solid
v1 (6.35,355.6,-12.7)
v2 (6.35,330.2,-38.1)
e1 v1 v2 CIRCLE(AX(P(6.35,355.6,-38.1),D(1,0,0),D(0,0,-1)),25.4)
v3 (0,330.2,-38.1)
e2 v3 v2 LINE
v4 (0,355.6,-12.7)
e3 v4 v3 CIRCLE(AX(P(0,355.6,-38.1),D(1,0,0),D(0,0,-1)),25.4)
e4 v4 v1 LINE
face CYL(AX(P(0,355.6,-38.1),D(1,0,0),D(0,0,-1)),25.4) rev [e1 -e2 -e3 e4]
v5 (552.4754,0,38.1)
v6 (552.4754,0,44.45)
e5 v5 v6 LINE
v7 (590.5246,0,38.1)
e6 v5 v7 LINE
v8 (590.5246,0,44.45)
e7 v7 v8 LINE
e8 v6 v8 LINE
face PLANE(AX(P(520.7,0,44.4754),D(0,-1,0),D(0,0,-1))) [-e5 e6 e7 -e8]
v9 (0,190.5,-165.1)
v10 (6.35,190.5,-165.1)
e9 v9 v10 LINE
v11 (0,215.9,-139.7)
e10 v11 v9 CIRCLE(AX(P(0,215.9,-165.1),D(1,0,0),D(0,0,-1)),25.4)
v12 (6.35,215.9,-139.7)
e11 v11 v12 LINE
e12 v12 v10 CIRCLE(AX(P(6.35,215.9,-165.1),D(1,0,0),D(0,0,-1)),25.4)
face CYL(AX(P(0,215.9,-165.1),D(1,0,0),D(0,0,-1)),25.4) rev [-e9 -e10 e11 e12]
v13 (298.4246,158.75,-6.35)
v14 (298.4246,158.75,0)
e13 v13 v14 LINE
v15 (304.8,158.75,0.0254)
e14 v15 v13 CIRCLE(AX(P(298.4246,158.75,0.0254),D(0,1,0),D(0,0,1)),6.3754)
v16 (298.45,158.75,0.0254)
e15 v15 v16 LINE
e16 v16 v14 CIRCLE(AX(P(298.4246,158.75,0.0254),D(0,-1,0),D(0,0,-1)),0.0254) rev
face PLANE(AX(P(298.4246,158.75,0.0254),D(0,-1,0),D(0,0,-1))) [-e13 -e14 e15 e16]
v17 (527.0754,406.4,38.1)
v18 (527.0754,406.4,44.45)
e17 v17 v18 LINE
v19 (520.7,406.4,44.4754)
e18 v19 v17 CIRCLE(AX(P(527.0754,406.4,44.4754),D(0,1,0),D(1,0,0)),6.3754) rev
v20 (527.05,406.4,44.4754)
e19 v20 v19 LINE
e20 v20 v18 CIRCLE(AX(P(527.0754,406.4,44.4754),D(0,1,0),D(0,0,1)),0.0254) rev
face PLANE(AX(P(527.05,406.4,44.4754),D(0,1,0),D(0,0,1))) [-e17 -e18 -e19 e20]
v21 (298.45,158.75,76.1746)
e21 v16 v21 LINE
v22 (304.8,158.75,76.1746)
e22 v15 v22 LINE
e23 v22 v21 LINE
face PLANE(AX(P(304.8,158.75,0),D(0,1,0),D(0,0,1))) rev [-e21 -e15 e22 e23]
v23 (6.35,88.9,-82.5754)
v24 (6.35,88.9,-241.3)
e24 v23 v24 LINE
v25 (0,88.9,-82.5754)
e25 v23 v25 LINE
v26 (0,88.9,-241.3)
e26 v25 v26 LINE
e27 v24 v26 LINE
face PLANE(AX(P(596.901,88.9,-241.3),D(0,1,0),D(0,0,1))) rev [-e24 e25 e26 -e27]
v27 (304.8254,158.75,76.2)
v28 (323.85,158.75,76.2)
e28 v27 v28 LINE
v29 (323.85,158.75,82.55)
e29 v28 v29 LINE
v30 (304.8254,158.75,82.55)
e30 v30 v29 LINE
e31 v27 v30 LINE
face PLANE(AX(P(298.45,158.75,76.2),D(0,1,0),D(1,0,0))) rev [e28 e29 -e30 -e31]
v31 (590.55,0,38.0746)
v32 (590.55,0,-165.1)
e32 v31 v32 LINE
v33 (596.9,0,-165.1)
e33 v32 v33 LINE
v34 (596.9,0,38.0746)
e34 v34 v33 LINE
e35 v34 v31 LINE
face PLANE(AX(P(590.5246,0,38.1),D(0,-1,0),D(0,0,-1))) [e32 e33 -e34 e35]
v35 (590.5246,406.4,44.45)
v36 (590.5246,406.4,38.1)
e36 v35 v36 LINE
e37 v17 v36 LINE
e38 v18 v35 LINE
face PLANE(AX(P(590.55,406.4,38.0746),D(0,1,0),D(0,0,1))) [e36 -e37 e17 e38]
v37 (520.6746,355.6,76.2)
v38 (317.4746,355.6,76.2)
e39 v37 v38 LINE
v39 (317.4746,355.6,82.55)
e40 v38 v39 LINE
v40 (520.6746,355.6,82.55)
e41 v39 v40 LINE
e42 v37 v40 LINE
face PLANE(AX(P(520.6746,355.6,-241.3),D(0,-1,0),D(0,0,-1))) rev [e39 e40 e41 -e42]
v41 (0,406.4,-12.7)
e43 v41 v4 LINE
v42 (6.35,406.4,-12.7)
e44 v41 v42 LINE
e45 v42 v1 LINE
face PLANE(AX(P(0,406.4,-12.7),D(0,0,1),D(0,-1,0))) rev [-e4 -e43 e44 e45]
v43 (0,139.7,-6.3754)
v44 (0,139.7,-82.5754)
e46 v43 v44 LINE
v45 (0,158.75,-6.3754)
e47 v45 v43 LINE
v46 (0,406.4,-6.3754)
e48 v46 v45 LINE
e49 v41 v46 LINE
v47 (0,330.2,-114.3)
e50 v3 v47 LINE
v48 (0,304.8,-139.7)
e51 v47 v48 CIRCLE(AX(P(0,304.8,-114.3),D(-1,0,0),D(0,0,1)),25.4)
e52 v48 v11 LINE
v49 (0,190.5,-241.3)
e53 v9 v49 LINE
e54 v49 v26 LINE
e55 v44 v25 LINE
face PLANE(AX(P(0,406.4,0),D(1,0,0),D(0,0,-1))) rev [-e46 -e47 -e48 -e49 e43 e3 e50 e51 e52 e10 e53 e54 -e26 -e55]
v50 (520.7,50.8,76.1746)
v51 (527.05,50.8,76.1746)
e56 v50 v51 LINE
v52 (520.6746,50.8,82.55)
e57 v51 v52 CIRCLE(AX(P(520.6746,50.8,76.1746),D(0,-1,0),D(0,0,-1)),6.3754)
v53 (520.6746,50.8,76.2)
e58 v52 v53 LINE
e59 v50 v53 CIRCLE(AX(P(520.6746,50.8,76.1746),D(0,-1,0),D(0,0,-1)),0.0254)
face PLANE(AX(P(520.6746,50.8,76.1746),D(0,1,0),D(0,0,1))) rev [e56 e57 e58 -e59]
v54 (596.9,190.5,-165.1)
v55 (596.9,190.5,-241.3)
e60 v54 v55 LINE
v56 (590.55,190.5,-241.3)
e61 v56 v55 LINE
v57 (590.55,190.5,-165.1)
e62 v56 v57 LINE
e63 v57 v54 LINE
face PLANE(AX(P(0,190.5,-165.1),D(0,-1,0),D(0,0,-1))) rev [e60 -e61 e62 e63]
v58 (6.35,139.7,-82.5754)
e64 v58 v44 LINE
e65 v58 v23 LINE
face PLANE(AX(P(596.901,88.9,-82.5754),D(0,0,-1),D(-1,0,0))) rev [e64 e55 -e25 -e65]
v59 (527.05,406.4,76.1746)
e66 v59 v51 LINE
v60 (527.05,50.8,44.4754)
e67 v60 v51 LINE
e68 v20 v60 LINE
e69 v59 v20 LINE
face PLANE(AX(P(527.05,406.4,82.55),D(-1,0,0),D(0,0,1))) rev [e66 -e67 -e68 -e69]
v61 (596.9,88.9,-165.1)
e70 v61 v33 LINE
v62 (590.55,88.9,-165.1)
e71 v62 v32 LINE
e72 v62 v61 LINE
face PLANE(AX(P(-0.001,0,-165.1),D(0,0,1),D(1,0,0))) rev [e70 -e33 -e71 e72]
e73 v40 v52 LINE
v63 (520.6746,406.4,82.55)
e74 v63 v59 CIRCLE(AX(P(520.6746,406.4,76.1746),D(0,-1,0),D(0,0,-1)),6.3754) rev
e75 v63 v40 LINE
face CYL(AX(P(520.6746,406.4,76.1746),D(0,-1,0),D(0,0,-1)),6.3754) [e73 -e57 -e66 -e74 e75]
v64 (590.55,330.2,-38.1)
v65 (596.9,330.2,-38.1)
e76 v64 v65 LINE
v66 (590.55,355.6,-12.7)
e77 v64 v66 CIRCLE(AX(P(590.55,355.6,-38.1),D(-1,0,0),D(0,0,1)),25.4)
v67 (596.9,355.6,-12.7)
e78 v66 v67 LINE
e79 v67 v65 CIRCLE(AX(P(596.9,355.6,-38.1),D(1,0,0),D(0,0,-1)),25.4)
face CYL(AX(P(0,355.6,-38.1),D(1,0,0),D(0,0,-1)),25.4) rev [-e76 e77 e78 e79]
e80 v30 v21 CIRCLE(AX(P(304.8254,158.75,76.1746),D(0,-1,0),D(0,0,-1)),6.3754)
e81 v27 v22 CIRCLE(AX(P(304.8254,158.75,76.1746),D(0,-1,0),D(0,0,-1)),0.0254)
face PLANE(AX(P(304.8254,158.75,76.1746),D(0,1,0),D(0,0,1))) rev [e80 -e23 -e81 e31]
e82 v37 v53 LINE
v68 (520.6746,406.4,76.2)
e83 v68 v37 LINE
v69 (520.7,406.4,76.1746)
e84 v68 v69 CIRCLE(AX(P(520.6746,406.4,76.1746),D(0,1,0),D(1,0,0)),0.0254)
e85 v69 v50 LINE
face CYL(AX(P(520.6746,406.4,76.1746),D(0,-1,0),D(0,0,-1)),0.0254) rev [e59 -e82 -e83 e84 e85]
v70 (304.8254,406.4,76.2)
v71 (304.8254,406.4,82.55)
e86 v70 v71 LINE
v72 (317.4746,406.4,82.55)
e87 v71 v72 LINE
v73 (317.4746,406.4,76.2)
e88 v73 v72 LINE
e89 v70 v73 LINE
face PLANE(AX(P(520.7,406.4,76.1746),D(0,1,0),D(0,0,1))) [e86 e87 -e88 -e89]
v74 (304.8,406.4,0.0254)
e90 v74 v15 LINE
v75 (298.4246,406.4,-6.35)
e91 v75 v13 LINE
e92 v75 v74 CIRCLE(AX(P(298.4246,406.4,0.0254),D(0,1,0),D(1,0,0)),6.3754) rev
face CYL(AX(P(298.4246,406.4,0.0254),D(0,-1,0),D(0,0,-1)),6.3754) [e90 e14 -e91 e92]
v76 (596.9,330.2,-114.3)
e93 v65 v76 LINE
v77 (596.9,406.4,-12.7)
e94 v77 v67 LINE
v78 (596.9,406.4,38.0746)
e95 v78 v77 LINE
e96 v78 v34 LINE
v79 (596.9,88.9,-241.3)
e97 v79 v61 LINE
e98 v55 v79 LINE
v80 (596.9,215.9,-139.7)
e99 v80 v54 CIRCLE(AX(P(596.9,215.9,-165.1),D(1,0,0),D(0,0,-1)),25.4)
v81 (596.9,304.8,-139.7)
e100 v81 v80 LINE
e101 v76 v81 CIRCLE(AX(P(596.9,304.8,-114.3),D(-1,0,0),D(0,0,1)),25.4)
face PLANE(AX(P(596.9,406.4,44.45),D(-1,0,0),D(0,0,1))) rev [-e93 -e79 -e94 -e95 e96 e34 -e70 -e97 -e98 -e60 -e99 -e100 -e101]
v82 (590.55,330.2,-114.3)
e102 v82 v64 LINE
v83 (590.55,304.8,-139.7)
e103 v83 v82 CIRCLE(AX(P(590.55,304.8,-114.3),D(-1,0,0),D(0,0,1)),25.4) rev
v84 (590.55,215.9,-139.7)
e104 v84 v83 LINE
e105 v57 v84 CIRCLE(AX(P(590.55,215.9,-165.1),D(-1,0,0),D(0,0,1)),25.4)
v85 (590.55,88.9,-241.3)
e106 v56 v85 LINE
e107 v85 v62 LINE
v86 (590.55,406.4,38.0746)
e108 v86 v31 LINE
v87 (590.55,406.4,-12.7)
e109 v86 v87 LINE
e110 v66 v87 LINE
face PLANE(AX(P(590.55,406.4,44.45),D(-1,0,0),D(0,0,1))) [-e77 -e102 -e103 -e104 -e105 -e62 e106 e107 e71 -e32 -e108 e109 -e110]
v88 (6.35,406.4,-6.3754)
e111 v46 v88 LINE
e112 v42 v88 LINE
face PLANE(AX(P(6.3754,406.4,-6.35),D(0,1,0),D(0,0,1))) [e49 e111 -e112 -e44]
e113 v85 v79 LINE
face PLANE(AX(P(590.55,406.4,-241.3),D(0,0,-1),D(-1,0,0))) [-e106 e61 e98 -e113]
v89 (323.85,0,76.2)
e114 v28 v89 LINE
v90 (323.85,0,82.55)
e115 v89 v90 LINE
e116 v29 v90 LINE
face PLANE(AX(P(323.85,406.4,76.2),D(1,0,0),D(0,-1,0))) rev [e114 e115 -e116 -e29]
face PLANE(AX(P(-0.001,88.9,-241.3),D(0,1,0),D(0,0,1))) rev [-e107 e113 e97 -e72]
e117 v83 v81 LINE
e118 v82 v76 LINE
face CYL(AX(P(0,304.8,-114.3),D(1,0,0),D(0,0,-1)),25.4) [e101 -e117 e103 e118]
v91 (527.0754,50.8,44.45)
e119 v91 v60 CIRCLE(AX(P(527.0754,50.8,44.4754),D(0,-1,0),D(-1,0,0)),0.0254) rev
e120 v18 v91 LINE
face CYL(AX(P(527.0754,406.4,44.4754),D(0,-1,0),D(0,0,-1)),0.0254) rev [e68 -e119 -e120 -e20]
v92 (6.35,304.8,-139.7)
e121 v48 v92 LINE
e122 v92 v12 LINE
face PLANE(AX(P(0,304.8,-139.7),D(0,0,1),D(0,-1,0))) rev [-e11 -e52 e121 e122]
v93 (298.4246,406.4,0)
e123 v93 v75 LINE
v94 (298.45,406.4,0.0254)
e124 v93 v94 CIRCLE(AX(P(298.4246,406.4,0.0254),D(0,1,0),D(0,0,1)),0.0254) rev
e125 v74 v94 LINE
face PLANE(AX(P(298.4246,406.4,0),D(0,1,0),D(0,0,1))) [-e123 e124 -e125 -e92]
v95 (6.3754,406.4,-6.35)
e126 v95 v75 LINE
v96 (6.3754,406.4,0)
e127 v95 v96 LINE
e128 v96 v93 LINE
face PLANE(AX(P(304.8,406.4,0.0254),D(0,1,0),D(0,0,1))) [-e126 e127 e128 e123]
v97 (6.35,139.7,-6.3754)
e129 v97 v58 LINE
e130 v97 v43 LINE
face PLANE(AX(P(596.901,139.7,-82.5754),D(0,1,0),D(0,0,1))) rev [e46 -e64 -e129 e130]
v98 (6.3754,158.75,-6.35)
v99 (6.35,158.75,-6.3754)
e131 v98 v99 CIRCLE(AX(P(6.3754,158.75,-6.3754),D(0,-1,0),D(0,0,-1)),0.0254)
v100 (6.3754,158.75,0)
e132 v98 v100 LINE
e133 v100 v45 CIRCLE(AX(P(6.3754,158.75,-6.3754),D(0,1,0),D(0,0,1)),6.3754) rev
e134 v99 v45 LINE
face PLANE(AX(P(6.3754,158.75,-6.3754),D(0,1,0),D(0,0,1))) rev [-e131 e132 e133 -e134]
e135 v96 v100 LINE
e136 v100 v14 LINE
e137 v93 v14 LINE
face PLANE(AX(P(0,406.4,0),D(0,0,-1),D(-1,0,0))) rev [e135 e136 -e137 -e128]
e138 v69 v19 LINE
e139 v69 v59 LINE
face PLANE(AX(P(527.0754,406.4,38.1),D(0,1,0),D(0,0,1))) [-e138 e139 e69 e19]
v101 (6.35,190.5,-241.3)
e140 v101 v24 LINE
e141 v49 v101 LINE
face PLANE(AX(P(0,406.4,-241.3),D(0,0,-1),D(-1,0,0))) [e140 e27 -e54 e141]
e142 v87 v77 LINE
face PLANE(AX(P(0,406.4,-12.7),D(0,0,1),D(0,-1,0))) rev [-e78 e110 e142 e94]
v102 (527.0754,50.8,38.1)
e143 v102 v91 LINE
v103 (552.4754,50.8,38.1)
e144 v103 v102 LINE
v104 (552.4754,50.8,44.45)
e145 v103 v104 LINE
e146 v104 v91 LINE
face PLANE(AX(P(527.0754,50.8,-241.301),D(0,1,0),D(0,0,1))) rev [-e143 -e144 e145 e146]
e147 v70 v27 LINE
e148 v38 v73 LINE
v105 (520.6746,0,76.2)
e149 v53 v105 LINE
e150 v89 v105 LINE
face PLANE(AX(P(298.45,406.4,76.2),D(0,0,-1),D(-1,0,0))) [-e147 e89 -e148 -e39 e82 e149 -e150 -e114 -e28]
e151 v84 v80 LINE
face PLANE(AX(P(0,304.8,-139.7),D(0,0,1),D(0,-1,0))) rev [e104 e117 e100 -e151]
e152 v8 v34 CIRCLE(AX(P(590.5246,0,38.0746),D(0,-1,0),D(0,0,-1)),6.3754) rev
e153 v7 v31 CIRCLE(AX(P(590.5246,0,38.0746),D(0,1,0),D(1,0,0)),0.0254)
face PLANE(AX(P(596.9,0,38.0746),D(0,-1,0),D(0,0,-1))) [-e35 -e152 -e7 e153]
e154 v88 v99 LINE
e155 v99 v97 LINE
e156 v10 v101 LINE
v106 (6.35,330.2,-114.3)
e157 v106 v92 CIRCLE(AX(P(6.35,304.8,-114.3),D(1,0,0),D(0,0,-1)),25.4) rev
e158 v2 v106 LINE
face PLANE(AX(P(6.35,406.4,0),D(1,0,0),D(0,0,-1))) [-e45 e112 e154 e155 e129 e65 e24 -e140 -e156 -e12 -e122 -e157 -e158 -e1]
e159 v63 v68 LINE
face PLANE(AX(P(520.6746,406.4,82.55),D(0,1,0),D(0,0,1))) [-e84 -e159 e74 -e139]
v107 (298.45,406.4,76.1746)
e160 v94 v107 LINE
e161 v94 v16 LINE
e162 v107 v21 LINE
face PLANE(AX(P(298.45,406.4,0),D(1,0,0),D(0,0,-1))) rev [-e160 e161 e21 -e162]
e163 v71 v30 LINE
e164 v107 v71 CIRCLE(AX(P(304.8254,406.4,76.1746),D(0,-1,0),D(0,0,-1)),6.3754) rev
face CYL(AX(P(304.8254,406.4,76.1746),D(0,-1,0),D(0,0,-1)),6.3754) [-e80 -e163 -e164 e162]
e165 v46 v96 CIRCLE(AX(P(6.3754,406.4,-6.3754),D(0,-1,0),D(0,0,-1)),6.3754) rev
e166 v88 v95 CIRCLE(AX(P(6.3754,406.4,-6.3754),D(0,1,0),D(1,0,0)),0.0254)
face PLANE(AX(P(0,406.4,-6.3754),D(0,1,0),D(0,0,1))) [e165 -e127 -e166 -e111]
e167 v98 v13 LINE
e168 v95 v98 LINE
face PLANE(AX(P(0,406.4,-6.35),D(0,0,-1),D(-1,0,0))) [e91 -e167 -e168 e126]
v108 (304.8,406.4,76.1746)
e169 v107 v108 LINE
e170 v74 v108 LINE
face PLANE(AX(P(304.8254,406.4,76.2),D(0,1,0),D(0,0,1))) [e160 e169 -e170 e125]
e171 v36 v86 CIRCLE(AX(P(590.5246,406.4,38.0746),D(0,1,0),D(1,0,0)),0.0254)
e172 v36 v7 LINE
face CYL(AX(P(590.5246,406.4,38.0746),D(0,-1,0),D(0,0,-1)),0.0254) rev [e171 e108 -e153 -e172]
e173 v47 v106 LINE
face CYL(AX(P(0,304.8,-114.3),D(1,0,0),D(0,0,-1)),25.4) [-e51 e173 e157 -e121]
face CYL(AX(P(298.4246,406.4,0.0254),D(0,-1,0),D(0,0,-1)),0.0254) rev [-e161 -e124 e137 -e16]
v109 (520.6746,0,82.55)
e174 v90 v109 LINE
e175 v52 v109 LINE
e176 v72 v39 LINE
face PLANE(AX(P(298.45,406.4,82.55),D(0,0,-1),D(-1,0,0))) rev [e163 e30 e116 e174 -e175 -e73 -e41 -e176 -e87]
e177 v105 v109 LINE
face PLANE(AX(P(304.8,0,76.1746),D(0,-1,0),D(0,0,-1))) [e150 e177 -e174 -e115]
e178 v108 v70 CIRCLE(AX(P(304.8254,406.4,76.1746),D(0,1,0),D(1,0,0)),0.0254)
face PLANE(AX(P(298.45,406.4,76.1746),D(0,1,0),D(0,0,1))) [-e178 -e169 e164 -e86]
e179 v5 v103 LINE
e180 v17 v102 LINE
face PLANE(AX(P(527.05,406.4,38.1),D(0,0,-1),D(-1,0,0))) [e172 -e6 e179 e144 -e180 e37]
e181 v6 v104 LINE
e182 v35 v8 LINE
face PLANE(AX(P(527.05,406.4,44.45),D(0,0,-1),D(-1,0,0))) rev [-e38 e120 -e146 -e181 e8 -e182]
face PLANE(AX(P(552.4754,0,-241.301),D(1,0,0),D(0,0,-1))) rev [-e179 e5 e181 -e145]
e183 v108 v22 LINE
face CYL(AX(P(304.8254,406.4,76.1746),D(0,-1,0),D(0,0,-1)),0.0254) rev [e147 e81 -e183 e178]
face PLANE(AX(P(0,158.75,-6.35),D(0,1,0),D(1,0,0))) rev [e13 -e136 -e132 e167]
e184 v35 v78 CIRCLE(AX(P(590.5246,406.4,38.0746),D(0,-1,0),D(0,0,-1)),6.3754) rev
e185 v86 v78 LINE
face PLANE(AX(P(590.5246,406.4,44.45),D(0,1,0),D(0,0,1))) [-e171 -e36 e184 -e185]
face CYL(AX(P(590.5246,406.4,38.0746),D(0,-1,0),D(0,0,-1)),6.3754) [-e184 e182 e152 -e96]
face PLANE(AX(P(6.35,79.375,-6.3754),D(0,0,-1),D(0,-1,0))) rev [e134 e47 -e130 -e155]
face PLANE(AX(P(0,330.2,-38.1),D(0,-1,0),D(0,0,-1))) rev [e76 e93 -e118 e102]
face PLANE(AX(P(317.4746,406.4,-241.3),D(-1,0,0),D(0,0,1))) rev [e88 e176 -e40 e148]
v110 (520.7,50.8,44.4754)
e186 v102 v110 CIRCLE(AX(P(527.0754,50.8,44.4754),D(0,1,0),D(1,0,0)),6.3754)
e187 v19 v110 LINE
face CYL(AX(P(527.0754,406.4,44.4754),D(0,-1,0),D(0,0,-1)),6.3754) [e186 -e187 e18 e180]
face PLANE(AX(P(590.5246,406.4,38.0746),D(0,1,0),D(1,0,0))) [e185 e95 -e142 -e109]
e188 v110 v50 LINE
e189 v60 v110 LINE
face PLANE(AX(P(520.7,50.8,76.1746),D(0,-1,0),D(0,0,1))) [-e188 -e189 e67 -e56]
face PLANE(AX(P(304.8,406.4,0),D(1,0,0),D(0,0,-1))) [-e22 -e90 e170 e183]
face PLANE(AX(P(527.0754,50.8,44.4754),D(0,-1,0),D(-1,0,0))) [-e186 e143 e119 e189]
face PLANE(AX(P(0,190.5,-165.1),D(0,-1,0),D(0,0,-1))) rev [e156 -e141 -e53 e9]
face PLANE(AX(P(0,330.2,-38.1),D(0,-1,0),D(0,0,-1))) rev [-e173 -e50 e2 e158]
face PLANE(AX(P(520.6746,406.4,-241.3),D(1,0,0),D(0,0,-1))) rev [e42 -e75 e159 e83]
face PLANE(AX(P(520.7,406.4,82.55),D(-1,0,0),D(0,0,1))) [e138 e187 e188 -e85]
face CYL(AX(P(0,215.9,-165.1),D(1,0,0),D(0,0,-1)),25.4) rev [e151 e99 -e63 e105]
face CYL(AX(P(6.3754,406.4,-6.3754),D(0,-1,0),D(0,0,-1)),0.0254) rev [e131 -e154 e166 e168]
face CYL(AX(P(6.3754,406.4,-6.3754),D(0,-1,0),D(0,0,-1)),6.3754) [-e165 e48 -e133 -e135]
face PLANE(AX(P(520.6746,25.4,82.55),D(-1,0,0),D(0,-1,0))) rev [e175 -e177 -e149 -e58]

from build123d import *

# Parameters (mm, degrees)
BASE_FLANGE1_DEPTH      = 406.4
CUT_EXTRUDE1_START      = -88.9254
CUT_EXTRUDE1_OUTLINE_W  = 324.85
CUT_EXTRUDE1_OUTLINE_H  = 158.75
CUT_EXTRUDE1_DEPTH      = 88.9254
CUT_EXTRUDE2_REACH      = 763.365
CUT_EXTRUDE3_REACH      = 763.365
SKETCH5_W               = 76.2
SKETCH5_H               = 88.9
CUT_EXTRUDE4_REACH      = 778.597
SKETCH6_W               = 25.4
SKETCH6_H               = 50.8
CUT_EXTRUDE5_REACH      = 793.41
SKETCH8_W               = 31.8008
SKETCH8_H               = 50.8
SKETCH9_W               = 203.2
SKETCH9_H               = 50.8
CUT_EXTRUDE6_DEPTH      = 792.409750066
CUT_EXTRUDE8_DEPTH      = 757.396689906
CUT_EXTRUDE8_DEPTH_BACK = 757.396689906


# Read off the part's stored shape, not the designer's step: Cut-Extrude1
# Sheet-metal steps are written as plain solids
with BuildPart() as part:
    # Sketch2 → Base-Flange1 (new body)
    with BuildSketch(Plane(origin=(0, 0, 0), x_dir=(1, 0, 0), z_dir=(0, 1, 0))):
        with BuildLine():
            Line((596.9, 241.3), (596.9, -38.0746))
            ThreePointArc((596.9, -38.0746), (595.032688573, -42.582688573), (590.5246, -44.45))
            Line((590.5246, -44.45), (527.0754, -44.45))
            ThreePointArc((527.0754, -44.45), (527.057439485, -44.457439486), (527.05, -44.4754))
            Line((527.05, -44.4754), (527.05, -76.1746))
            ThreePointArc((527.05, -76.1746), (525.182688573, -80.682688573), (520.6746, -82.55))
            Line((520.6746, -82.55), (304.8254, -82.55))
            ThreePointArc((304.8254, -82.55), (300.317311427, -80.682688573), (298.45, -76.1746))
            Line((298.45, -76.1746), (298.45, -0.0254))
            ThreePointArc((298.45, -0.0254), (298.442560512, -0.007439487), (298.4246, 0))
            Line((298.4246, 0), (6.3754, 0))
            ThreePointArc((6.3754, 0), (1.867311427, 1.867311427), (0, 6.3754))
            Line((0, 6.3754), (0, 241.3))
            Line((0, 241.3), (6.35, 241.3))
            Line((6.35, 241.3), (6.35, 6.3754))
            ThreePointArc((6.35, 6.3754), (6.357439488, 6.357439488), (6.3754, 6.35))
            Line((6.3754, 6.35), (298.424685325, 6.35))
            ThreePointArc((298.424685325, 6.35), (302.932718863, 4.482658283), (304.8, -0.025400347))
            Line((304.8, -0.025400347), (304.8, -76.1746))
            ThreePointArc((304.8, -76.1746), (304.807439488, -76.192560512), (304.8254, -76.2))
            Line((304.8254, -76.2), (520.6746, -76.2))
            ThreePointArc((520.6746, -76.2), (520.692560512, -76.192560512), (520.7, -76.1746))
            Line((520.7, -76.1746), (520.7, -44.47559657))
            ThreePointArc((520.7, -44.47559657), (522.567241925, -39.967380926), (527.075399994, -38.1))
            Line((527.075399994, -38.1), (590.5246, -38.1))
            ThreePointArc((590.5246, -38.1), (590.542560512, -38.092560512), (590.55, -38.0746))
            Line((590.55, -38.0746), (590.55, 241.3))
            Line((590.55, 241.3), (596.9, 241.3))
        make_face()
    extrude(amount=BASE_FLANGE1_DEPTH)

    # Cut-Extrude1 outline → Cut-Extrude1 (cut)
    with BuildSketch(Plane.XY.offset(82.55).offset(CUT_EXTRUDE1_START)):
        with Locations((161.425, 79.375)):
            Rectangle(CUT_EXTRUDE1_OUTLINE_W, CUT_EXTRUDE1_OUTLINE_H)
    extrude(amount=CUT_EXTRUDE1_DEPTH, mode=Mode.SUBTRACT)

    # Sketch4 → Cut-Extrude2 (cut, up to next)
    with BuildSketch(Plane.ZY, mode=Mode.PRIVATE) as cut_extrude2_sk1:
        Polygon((-241.3, 0), (-6.3754, 0), (-6.3754, 139.7), (-82.5754, 139.7), (-82.5754, 88.9), (-241.3, 88.9), align=None)
    cut_extrude2_tool1 = extrude(cut_extrude2_sk1.sketch, amount=-CUT_EXTRUDE2_REACH, mode=Mode.PRIVATE) & part.part
    add(cut_extrude2_tool1.solids().sort_by_distance((0, 55.372169, -111.42813))[0], mode=Mode.SUBTRACT)

    # Sketch5 → Cut-Extrude3 (cut, up to next)
    with BuildSketch(Plane(origin=(596.9, 0, 0), x_dir=(0, 0, -1), z_dir=(1, 0, 0)), mode=Mode.PRIVATE) as cut_extrude3_sk1:
        with Locations((203.2, 44.45)):
            Rectangle(SKETCH5_W, SKETCH5_H)
    cut_extrude3_tool1 = extrude(cut_extrude3_sk1.sketch, amount=-CUT_EXTRUDE3_REACH, mode=Mode.PRIVATE) & part.part
    add(cut_extrude3_tool1.solids().sort_by_distance((596.9, 44.45, -203.2))[0], mode=Mode.SUBTRACT)

    # Sketch6 → Cut-Extrude4 (cut, up to next)
    with BuildSketch(Plane.XY.offset(44.45), mode=Mode.PRIVATE) as cut_extrude4_sk1:
        with Locations((539.7754, 25.4)):
            Rectangle(SKETCH6_W, SKETCH6_H)
    cut_extrude4_tool1 = extrude(cut_extrude4_sk1.sketch, amount=-CUT_EXTRUDE4_REACH, mode=Mode.PRIVATE) & part.part
    add(cut_extrude4_tool1.solids().sort_by_distance((539.7754, 25.4, 44.45))[0], mode=Mode.SUBTRACT)

    # Sketch8 → Cut-Extrude5 (cut, up to next)
    with BuildSketch(Plane.XY.offset(82.55), mode=Mode.PRIVATE) as cut_extrude5_sk1:
        with Locations((536.575, 25.4)):
            Rectangle(SKETCH8_W, SKETCH8_H)
    cut_extrude5_tool1 = extrude(cut_extrude5_sk1.sketch, amount=-CUT_EXTRUDE5_REACH, mode=Mode.PRIVATE) & part.part
    add(cut_extrude5_tool1.solids().sort_by_distance((536.575, 25.4, 82.55))[0], mode=Mode.SUBTRACT)

    # Sketch9 → Cut-Extrude6 (cut, through all)
    with BuildSketch(Plane.XY.offset(82.55)):
        with Locations((419.0746, 381)):
            Rectangle(SKETCH9_W, SKETCH9_H)
    extrude(amount=-CUT_EXTRUDE6_DEPTH, mode=Mode.SUBTRACT)

    # Sketch11 → Cut-Extrude8 (cut, two sides: drawn at the far end of the back side and taken through both)
    with BuildSketch(Plane(origin=(6.35, 0, 0), x_dir=(0, 0, -1), z_dir=(1, 0, 0)).offset(-CUT_EXTRUDE8_DEPTH_BACK)):
        with BuildLine():
            Line((12.7, 406.4), (12.7, 355.6))
            ThreePointArc((12.7, 355.6), (20.139487758, 337.639487758), (38.1, 330.2))
            Line((38.1, 330.2), (114.3, 330.2))
            ThreePointArc((114.3, 330.2), (132.260512242, 322.760512242), (139.7, 304.8))
            Line((139.7, 304.8), (139.7, 215.9))
            ThreePointArc((139.7, 215.9), (147.139487758, 197.939487758), (165.1, 190.5))
            Line((165.1, 190.5), (241.3, 190.5))
            Line((241.3, 190.5), (241.3, 406.4))
            Line((241.3, 406.4), (12.7, 406.4))
        make_face()
    extrude(amount=CUT_EXTRUDE8_DEPTH + CUT_EXTRUDE8_DEPTH_BACK, mode=Mode.SUBTRACT)


solid = part.part
